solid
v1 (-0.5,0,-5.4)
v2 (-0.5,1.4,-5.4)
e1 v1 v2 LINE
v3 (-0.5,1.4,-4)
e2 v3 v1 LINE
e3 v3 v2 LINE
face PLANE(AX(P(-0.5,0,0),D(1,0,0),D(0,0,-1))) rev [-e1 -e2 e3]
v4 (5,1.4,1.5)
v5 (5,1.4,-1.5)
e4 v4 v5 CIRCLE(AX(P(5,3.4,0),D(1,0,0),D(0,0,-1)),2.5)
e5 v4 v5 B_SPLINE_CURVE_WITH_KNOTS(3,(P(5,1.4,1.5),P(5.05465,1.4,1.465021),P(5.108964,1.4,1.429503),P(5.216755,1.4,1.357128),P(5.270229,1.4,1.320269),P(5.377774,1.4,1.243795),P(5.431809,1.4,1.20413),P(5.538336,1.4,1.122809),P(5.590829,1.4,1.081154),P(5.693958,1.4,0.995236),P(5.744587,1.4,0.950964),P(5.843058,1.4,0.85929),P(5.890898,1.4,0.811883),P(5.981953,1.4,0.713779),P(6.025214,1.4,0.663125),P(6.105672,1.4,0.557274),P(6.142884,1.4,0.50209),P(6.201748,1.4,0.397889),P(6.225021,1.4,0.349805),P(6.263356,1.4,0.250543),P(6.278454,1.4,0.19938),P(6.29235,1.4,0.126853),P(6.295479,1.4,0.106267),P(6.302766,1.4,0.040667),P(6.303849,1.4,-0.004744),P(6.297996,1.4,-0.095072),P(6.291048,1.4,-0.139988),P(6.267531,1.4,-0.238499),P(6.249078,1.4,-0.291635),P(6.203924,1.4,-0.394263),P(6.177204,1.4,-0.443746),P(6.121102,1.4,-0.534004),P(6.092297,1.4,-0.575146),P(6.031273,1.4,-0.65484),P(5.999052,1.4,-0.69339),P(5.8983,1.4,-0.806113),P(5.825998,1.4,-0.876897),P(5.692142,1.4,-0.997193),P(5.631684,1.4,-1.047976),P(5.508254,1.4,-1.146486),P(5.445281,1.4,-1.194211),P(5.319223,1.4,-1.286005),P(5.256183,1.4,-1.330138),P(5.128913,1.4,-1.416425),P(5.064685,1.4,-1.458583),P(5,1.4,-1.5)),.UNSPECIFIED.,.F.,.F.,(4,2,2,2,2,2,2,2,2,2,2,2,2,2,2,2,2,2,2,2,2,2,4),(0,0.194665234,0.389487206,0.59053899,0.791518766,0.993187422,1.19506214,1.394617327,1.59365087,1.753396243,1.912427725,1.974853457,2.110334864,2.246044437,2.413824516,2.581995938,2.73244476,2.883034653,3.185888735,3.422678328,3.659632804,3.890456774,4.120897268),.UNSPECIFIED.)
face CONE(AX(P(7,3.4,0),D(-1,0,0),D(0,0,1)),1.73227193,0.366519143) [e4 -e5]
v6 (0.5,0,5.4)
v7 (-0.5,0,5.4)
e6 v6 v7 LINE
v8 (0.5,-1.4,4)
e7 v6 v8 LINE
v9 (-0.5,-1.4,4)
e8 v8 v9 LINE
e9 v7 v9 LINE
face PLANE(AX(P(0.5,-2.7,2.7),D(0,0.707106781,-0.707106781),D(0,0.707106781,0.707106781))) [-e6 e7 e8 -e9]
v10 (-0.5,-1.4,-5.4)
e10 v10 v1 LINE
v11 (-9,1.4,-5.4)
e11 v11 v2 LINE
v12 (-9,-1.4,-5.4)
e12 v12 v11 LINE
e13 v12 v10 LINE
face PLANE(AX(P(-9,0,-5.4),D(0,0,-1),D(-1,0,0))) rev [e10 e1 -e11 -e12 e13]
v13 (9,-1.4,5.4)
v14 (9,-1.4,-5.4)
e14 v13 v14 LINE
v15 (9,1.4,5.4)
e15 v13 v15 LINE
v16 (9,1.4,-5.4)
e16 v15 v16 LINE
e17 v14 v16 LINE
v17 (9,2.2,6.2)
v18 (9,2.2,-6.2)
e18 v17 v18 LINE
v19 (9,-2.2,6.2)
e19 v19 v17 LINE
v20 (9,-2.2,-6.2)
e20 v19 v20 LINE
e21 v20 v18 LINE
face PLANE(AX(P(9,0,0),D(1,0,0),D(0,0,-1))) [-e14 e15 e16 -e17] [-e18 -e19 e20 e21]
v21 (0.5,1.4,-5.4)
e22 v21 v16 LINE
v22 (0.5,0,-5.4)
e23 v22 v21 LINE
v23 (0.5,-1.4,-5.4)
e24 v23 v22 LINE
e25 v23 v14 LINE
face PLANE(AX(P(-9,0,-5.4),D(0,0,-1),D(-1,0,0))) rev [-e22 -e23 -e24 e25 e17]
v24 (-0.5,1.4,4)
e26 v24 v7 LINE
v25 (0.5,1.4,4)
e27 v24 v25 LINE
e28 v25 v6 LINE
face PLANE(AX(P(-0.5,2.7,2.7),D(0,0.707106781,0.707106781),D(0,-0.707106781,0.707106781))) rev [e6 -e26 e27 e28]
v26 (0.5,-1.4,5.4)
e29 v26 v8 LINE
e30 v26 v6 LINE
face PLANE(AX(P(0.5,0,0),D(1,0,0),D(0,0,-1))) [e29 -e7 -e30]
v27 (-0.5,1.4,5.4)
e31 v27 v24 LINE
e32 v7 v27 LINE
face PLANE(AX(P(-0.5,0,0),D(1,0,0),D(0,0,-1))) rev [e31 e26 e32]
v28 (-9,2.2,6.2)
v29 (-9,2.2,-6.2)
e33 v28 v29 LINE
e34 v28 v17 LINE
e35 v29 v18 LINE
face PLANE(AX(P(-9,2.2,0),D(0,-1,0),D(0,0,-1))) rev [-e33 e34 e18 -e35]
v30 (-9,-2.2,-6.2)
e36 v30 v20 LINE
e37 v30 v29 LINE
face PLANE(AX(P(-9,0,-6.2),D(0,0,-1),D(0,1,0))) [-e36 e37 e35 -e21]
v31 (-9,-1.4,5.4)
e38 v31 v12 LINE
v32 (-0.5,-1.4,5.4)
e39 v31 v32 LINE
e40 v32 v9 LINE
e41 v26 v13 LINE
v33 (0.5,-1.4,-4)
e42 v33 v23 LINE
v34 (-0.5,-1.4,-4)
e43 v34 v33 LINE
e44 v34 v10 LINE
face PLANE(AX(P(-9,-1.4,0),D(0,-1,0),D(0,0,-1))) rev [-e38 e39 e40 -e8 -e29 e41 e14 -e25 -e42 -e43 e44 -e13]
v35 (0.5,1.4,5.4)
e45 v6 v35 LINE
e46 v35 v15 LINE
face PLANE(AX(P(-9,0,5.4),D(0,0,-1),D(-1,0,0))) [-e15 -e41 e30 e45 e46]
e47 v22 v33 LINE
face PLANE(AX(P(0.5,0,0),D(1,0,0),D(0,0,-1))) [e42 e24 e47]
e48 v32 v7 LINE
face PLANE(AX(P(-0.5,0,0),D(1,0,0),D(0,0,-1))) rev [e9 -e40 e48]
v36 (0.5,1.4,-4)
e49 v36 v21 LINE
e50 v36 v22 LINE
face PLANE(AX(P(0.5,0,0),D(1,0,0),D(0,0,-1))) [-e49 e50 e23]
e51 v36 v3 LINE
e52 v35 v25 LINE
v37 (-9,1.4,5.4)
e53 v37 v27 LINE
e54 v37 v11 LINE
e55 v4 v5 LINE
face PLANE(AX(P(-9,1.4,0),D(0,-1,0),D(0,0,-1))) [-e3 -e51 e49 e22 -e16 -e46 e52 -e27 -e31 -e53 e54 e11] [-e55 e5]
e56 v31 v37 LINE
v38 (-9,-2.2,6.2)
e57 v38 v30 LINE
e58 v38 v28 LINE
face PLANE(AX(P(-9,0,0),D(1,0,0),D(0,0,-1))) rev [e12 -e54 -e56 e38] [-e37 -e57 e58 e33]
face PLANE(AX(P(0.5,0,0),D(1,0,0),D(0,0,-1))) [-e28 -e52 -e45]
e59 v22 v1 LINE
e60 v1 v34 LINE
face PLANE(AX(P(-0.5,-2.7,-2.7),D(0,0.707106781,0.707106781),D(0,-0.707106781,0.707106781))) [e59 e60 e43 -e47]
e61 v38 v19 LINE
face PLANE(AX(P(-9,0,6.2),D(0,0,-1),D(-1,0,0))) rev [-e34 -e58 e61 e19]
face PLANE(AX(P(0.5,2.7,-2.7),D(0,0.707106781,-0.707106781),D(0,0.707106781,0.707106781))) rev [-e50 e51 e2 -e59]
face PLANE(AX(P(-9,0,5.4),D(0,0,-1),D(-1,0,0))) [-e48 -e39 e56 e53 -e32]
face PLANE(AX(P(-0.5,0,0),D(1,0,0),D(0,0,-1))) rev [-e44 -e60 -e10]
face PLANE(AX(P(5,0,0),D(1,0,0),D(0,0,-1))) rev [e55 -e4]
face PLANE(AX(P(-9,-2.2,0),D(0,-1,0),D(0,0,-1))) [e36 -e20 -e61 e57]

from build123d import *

# Parameters (mm, degrees)
BOSS_EXTRUDE1_DEPTH      = 9
BOSS_EXTRUDE1_DEPTH_BACK = 9
SKETCH1_W                = 12.4
SKETCH1_H                = 4.4
SKETCH1_W_2              = 10.8
SKETCH1_H_2              = 2.8
BOSS_EXTRUDE2_DEPTH      = 0.5
BOSS_EXTRUDE2_DEPTH_BACK = 0.5
BOSS_EXTRUDE3_START      = 5
BOSS_EXTRUDE3_DEPTH      = 2
CHAMFER1_SIZE            = 2
CHAMFER1_SIZE_2          = 0.76772807


with BuildPart() as part:
    # Sketch1 → Boss-Extrude1 (new, two sides: drawn at the far end of the back side and taken through both)
    with BuildSketch(Plane(origin=(0, 0, 0), x_dir=(0, 0, -1), z_dir=(1, 0, 0)).offset(-BOSS_EXTRUDE1_DEPTH_BACK)):
        Rectangle(SKETCH1_W, SKETCH1_H)
        Rectangle(SKETCH1_W_2, SKETCH1_H_2, mode=Mode.SUBTRACT)
    extrude(amount=BOSS_EXTRUDE1_DEPTH + BOSS_EXTRUDE1_DEPTH_BACK)

    # Sketch1<3> → Boss-Extrude2 (add, two sides: drawn at the far end of the back side and taken through both)
    with BuildSketch(Plane(origin=(0, 0, 0), x_dir=(0, 0, -1), z_dir=(1, 0, 0)).offset(-BOSS_EXTRUDE2_DEPTH_BACK)):
        Polygon((-5.4, 1.4), (-5.4, 0), (-4, 1.4), align=None)
        Polygon((4, 1.4), (5.4, 0), (5.4, 1.4), align=None)
        Polygon((-5.4, 0), (-5.4, -1.4), (-4, -1.4), align=None)
        Polygon((5.4, 0), (4, -1.4), (5.4, -1.4), align=None)
    extrude(amount=BOSS_EXTRUDE2_DEPTH + BOSS_EXTRUDE2_DEPTH_BACK)

    # Sketch1<4> → Boss-Extrude3 (add)
    with BuildSketch(Plane(origin=(0, 0, 0), x_dir=(0, 0, -1), z_dir=(1, 0, 0)).offset(BOSS_EXTRUDE3_START)):
        with BuildLine():
            Line((1.5, 1.4), (-1.5, 1.4))
            ThreePointArc((-1.5, 1.4), (0, 0.9), (1.5, 1.4))
        make_face()
    extrude(amount=BOSS_EXTRUDE3_DEPTH)

    # Chamfer1
    # the kernel refuses this chamfer: 2, 0.76772807 mm, written as the material it takes off along each edge
    with BuildSketch(Plane(origin=(7, 3.4, 0), x_dir=(0, 0.9120061732371908, 0.4101764741879463), z_dir=(0, 0.4101764741879463, -0.9120061732371908))) as chamfer1_piece_1_section:
        Polygon((2.5, -CHAMFER1_SIZE), (2.5 - CHAMFER1_SIZE_2, 0), (2.5, 0), align=None)
    chamfer1_piece_1 = revolve(axis=Axis((7, 3.4, 0), (1, 0, 0)), revolution_arc=311.56815777, mode=Mode.PRIVATE)
    chamfer1_piece_1 = split(chamfer1_piece_1, bisect_by=Plane(origin=(6.216344198, 1.4, 0), z_dir=(0, -1, 0)), keep=Keep.TOP, mode=Mode.PRIVATE)
    add(chamfer1_piece_1, mode=Mode.SUBTRACT)


solid = part.part
